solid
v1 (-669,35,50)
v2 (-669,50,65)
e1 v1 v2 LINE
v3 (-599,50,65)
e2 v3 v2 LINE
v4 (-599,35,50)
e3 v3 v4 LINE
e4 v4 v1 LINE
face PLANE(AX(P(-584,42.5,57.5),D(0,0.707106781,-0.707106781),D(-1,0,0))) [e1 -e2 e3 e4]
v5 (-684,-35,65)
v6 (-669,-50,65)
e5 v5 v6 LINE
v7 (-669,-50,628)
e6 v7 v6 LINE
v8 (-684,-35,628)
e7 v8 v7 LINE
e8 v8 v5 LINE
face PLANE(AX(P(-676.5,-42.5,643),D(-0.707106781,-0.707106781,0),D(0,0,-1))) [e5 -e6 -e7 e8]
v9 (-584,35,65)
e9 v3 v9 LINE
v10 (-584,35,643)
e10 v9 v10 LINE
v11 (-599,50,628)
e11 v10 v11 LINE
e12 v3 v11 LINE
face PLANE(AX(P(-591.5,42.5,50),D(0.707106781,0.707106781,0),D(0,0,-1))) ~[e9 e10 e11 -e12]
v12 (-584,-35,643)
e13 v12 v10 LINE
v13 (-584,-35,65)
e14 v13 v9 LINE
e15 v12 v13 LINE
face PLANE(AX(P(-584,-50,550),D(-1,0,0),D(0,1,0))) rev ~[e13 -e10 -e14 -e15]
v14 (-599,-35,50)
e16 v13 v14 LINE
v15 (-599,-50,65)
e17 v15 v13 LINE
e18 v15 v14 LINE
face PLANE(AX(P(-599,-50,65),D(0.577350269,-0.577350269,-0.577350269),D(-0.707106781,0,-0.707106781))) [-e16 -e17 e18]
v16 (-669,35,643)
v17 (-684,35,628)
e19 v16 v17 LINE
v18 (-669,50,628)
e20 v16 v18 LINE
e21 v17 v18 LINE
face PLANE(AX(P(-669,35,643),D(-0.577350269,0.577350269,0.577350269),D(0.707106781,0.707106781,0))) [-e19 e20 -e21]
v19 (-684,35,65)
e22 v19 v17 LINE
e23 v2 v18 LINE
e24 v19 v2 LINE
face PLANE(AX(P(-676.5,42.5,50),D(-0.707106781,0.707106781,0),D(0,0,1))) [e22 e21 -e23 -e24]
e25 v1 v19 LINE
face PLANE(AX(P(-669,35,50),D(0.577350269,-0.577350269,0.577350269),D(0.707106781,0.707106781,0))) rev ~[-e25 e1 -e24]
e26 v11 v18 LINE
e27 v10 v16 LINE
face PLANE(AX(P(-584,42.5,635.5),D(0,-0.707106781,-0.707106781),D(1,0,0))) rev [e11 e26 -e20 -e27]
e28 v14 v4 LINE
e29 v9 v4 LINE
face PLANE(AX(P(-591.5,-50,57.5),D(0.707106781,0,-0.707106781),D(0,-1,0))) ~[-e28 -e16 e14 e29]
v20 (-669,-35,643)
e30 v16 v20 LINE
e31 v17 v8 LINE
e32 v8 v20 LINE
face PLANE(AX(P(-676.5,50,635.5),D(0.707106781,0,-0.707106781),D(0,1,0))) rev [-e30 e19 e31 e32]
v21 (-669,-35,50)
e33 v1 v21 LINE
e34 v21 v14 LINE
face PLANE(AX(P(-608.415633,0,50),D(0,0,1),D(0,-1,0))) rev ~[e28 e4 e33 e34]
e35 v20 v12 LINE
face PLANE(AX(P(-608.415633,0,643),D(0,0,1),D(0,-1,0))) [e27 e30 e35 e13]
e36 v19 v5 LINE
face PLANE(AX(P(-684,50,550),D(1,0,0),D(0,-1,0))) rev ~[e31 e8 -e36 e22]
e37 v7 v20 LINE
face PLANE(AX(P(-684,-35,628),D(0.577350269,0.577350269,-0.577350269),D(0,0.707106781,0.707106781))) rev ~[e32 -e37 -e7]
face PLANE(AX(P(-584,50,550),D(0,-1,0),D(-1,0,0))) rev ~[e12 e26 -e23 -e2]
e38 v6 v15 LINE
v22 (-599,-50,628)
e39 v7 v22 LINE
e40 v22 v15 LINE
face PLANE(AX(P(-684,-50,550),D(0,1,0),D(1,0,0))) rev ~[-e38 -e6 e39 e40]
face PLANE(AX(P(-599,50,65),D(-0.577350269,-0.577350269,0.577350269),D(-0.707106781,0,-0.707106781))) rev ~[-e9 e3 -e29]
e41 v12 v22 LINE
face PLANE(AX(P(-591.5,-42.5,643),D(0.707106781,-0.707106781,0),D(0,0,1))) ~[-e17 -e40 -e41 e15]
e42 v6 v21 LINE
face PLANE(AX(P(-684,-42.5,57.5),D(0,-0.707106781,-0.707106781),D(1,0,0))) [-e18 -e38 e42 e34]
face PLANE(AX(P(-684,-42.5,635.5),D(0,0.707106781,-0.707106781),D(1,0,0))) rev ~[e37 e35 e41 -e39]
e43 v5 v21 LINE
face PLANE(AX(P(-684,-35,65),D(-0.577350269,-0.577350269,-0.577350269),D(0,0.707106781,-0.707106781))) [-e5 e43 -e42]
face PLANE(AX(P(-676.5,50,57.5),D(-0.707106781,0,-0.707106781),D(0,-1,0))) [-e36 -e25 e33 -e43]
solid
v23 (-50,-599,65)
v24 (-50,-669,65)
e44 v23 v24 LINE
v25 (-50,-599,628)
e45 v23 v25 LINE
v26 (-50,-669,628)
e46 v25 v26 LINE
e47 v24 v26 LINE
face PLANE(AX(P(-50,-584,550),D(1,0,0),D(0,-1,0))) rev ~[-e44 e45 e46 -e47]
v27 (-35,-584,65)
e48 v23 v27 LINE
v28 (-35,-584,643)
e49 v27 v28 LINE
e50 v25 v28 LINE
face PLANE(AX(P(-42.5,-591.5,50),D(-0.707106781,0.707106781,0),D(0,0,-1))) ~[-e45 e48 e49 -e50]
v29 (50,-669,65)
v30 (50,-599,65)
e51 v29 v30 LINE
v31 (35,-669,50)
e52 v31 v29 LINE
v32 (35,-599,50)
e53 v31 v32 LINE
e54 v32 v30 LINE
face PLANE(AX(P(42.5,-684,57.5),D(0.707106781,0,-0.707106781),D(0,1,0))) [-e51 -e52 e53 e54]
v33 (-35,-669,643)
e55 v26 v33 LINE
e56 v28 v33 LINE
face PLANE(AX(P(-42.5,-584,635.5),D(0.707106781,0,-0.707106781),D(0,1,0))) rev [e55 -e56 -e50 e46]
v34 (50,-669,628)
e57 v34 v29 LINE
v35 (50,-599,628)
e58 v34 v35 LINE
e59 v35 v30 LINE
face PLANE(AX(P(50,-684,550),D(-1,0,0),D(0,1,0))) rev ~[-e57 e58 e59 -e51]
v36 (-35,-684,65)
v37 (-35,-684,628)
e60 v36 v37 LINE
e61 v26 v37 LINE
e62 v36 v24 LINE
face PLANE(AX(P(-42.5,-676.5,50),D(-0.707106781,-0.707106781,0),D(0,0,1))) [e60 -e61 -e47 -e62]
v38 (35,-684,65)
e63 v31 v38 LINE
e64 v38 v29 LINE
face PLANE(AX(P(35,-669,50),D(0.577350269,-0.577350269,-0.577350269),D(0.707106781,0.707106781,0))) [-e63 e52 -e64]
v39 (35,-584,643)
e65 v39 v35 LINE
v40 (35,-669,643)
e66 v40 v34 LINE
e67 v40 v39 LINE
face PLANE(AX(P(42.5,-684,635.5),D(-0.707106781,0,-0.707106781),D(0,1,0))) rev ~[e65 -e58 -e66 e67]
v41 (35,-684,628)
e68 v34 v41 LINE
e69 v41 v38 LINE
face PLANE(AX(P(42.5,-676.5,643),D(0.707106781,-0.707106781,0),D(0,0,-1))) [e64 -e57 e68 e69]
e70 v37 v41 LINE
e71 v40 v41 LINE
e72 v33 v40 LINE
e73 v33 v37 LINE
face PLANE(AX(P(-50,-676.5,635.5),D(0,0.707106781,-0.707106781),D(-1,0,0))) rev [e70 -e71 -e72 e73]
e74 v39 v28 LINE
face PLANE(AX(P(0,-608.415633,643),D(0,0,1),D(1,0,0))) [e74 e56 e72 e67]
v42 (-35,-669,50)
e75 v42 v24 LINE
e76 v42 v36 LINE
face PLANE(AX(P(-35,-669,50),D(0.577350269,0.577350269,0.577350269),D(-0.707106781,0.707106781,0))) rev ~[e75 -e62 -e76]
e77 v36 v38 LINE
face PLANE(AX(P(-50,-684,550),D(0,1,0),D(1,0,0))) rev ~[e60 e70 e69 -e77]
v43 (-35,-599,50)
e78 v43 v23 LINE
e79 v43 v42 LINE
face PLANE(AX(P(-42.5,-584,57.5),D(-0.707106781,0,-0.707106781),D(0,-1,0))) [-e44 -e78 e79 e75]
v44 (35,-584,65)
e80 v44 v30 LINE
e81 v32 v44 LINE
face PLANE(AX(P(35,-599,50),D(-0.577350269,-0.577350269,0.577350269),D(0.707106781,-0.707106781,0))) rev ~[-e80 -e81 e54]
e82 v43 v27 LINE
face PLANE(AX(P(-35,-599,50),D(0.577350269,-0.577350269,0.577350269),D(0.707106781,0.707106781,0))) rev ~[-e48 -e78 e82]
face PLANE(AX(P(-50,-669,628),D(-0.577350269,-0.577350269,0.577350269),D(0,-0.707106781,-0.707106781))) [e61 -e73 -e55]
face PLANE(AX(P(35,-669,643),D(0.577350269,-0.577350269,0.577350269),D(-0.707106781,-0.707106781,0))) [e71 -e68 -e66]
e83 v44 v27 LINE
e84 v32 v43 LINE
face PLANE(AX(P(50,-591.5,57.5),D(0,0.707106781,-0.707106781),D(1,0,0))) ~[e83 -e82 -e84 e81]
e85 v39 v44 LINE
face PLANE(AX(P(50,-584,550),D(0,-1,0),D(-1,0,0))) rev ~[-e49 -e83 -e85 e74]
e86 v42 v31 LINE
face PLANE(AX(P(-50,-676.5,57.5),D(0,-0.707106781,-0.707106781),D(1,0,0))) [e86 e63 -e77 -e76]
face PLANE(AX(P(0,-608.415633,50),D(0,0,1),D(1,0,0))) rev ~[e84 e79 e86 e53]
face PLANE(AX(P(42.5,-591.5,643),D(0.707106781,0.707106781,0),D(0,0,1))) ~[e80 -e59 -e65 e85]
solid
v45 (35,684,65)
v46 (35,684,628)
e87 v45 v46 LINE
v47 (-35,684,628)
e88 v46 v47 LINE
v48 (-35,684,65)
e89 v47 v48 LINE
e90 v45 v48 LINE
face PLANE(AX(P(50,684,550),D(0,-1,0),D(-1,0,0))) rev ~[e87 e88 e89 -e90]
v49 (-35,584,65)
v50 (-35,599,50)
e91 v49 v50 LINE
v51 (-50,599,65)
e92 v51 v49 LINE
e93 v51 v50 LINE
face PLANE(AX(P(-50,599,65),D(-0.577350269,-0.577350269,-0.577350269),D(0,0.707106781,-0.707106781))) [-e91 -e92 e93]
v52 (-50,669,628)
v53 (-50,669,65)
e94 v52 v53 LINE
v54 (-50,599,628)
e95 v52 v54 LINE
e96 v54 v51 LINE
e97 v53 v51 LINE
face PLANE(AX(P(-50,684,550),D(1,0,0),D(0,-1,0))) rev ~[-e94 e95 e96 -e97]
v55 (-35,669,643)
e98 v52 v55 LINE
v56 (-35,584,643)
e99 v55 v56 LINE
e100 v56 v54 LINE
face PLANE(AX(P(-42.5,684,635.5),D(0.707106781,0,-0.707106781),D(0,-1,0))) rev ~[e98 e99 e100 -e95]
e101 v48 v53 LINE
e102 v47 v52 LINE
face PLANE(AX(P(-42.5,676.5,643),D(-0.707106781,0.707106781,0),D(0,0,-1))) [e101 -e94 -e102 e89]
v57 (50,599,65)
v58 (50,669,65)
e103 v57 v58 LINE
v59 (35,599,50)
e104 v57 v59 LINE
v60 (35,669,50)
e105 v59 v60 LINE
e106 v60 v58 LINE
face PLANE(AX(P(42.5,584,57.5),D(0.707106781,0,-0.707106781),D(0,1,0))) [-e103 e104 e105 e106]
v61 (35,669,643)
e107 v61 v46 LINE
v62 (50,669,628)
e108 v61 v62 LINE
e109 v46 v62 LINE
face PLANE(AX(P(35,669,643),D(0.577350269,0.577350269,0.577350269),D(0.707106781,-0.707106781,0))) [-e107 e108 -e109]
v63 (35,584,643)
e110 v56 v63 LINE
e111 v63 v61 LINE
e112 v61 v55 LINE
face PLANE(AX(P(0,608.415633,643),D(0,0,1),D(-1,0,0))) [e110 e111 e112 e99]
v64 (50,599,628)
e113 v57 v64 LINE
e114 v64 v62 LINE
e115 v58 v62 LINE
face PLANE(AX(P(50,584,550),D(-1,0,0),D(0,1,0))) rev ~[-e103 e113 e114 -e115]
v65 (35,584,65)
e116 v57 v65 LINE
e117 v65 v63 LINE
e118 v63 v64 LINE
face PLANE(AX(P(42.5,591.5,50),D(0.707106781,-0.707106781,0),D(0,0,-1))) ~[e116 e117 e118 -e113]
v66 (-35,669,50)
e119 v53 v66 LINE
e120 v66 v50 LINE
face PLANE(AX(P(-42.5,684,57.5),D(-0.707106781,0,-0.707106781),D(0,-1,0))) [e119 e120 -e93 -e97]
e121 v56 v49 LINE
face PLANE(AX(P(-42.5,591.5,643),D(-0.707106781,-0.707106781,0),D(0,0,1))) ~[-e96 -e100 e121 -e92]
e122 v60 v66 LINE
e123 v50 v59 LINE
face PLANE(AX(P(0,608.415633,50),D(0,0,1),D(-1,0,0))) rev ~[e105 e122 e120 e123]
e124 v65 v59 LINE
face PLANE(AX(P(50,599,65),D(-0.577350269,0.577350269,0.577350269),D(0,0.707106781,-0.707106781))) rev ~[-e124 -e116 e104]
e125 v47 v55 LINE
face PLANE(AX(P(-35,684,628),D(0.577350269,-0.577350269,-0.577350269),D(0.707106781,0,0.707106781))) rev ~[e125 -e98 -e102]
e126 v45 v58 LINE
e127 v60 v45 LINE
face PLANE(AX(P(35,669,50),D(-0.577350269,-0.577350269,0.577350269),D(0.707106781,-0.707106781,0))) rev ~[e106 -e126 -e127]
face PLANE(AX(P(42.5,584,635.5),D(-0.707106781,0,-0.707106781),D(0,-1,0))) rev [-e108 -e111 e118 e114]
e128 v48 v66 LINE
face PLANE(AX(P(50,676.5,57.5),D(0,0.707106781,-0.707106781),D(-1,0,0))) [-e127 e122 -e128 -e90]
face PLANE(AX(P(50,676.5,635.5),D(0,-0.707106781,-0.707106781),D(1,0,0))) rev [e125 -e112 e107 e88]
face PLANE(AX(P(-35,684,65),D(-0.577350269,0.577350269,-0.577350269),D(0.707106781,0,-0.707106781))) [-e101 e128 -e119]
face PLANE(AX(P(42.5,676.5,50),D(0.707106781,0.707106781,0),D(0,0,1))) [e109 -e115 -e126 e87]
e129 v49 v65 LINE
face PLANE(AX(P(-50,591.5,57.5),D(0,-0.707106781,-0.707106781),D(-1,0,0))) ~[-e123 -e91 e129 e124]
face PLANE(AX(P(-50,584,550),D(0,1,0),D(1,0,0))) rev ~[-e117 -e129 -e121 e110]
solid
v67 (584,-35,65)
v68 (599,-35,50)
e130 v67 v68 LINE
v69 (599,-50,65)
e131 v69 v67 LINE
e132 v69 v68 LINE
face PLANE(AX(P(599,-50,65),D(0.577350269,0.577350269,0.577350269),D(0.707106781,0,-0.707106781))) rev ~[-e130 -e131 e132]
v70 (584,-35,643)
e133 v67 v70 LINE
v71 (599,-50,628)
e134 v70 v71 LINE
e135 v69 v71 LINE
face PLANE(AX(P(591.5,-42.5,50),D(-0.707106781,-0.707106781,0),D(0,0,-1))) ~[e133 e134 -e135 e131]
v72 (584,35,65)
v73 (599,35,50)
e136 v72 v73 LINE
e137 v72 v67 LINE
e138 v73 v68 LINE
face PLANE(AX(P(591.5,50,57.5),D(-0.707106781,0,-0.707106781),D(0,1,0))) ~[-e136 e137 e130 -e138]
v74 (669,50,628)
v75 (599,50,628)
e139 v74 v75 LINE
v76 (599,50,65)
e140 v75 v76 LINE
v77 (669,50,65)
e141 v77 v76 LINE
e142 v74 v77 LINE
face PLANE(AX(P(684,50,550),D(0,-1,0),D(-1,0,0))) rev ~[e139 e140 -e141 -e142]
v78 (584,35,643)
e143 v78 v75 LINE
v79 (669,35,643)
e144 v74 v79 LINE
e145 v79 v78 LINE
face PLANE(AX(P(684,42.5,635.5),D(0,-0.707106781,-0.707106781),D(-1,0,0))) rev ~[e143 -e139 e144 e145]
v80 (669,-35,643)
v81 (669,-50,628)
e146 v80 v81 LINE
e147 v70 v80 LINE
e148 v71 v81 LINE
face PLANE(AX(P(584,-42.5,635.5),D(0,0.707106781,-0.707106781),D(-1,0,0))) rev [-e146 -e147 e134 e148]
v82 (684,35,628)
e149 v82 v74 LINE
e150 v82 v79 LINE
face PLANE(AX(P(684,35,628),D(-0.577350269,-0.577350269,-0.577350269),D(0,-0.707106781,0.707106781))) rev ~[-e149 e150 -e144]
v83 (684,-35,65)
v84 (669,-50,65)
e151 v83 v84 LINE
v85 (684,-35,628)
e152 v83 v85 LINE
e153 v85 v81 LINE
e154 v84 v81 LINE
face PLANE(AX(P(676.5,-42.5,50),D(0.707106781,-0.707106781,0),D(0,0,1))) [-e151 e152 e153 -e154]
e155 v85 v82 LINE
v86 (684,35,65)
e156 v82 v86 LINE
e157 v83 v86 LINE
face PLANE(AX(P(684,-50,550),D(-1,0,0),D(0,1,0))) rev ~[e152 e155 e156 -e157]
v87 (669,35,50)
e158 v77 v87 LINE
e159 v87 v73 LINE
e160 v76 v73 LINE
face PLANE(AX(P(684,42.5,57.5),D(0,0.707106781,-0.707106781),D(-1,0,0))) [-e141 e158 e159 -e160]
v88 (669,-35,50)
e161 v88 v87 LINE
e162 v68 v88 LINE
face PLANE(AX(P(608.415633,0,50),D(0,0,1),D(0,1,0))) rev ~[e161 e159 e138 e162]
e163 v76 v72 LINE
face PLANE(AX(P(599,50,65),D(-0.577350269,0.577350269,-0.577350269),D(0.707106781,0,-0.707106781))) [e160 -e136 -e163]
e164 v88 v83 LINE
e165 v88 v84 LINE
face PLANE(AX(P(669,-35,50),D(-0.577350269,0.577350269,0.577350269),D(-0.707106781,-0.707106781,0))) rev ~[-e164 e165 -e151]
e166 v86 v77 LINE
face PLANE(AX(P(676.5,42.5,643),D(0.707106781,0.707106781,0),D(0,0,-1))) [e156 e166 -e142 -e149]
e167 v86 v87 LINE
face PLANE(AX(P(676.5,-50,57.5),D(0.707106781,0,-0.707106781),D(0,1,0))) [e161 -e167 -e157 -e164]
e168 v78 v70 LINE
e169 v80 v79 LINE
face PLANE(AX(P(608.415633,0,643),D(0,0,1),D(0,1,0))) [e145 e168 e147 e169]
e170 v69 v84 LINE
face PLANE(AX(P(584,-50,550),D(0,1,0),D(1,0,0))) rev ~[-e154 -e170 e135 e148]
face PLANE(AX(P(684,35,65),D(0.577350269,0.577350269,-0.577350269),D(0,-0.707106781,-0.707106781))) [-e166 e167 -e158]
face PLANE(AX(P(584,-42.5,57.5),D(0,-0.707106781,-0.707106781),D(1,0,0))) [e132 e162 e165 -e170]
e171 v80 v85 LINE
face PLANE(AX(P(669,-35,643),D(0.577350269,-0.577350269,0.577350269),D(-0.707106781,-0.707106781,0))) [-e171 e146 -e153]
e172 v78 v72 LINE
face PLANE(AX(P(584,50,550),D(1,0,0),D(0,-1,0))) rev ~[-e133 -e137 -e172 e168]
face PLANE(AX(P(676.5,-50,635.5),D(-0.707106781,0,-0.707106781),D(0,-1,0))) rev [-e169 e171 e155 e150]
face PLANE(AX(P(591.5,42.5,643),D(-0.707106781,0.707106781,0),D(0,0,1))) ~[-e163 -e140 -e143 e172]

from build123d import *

# Parameters (mm, degrees)
F4_DEPTH        = 500
F4_DEPTH_BACK   = 93
F4_COPIES_COUNT = 4
F5_SIZE         = 15
F5_2_SIZE       = 15
F5_3_SIZE       = 15
F5_4_SIZE       = 15


# Not quite as in the source:
# - a feature of the source that left no trace in its solid (it failed there, or was rolled back) is left out
# - a pattern or mirror of a feature is missing from the dataset's text; its kind, count and spacing are read off the source's solid
# - the program builds the solid bodies; features that only make, move or delete a surface that nothing else refers to are left out


with BuildPart() as f4:
    # F3 (on offset) → F4 (new body, two sides)
    with BuildSketch(Plane.XY.offset(550)) as f4_sk:
        with BuildLine():
            Line((50, -584), (-50, -584))
            Line((-50, -584), (-50, -632.0253159487))
            ThreePointArc((-50, -632.0253159487), (0, -634), (50, -632.0253159487))
            Line((50, -632.0253159487), (50, -584))
        make_face()
        with BuildLine():
            ThreePointArc((50, -632.0253159487), (0, -634), (-50, -632.0253159487))
            Line((-50, -632.0253159487), (-50, -684))
            Line((-50, -684), (50, -684))
            Line((50, -684), (50, -632.0253159487))
        make_face()
    extrude(amount=-F4_DEPTH)
    extrude(f4_sk.sketch, amount=F4_DEPTH_BACK)


with BuildPart() as f4_copies_1:
    # F4_copies: instance of F4
    add(f4.part.rotate(Axis((0, 0, 0), (0, 0, 1)), 1 * 360 / F4_COPIES_COUNT))

    # F5#2
    f5_2_edges = [f4_copies_1.edges().sort_by_distance(p)[0] for p in [
        (584, 0, 50),
        (584, -50, 346.5),
        (584, 50, 346.5),
        (634, 50, 50),
        (634, 50, 643),
        (684, 50, 346.5),
        (684, -50, 346.5),
        (684, 0, 50),
        (684, 0, 643),
        (634, -50, 643),
        (634, -50, 50),
    ]]
    chamfer(f5_2_edges, length=F5_2_SIZE)


with BuildPart() as f4_copies_2:
    # F4_copies: instance of F4
    add(f4.part.rotate(Axis((0, 0, 0), (0, 0, 1)), 2 * 360 / F4_COPIES_COUNT))

    # F5#3
    f5_3_edges = [f4_copies_2.edges().sort_by_distance(p)[0] for p in [
        (0, 584, 50),
        (50, 584, 346.5),
        (-50, 584, 346.5),
        (-50, 634, 50),
        (-50, 634, 643),
        (-50, 684, 346.5),
        (50, 684, 346.5),
        (0, 684, 50),
        (0, 684, 643),
        (50, 634, 643),
        (50, 634, 50),
    ]]
    chamfer(f5_3_edges, length=F5_3_SIZE)


with BuildPart() as f4_copies_3:
    # F4_copies: instance of F4
    add(f4.part.rotate(Axis((0, 0, 0), (0, 0, 1)), 3 * 360 / F4_COPIES_COUNT))

    # F5#4
    f5_4_edges = [f4_copies_3.edges().sort_by_distance(p)[0] for p in [
        (-584, 0, 50),
        (-584, 50, 346.5),
        (-584, -50, 346.5),
        (-634, -50, 50),
        (-634, -50, 643),
        (-684, -50, 346.5),
        (-684, 50, 346.5),
        (-684, 0, 50),
        (-684, 0, 643),
        (-634, 50, 643),
        (-634, 50, 50),
    ]]
    chamfer(f5_4_edges, length=F5_4_SIZE)


with BuildPart() as f4_1:
    add(f4.part)

    # F5
    f5_edges = [f4_1.edges().sort_by_distance(p)[0] for p in [
        (50, -684, 346.5),
        (50, -634, 643),
        (0, -684, 643),
        (-50, -634, 643),
        (50, -584, 346.5),
        (-50, -584, 346.5),
        (-50, -684, 346.5),
        (0, -684, 50),
        (-50, -634, 50),
        (0, -584, 50),
        (50, -634, 50),
    ]]
    chamfer(f5_edges, length=F5_SIZE)


solid = Compound([f4_copies_1.part, f4_copies_2.part, f4_copies_3.part, f4_1.part])
